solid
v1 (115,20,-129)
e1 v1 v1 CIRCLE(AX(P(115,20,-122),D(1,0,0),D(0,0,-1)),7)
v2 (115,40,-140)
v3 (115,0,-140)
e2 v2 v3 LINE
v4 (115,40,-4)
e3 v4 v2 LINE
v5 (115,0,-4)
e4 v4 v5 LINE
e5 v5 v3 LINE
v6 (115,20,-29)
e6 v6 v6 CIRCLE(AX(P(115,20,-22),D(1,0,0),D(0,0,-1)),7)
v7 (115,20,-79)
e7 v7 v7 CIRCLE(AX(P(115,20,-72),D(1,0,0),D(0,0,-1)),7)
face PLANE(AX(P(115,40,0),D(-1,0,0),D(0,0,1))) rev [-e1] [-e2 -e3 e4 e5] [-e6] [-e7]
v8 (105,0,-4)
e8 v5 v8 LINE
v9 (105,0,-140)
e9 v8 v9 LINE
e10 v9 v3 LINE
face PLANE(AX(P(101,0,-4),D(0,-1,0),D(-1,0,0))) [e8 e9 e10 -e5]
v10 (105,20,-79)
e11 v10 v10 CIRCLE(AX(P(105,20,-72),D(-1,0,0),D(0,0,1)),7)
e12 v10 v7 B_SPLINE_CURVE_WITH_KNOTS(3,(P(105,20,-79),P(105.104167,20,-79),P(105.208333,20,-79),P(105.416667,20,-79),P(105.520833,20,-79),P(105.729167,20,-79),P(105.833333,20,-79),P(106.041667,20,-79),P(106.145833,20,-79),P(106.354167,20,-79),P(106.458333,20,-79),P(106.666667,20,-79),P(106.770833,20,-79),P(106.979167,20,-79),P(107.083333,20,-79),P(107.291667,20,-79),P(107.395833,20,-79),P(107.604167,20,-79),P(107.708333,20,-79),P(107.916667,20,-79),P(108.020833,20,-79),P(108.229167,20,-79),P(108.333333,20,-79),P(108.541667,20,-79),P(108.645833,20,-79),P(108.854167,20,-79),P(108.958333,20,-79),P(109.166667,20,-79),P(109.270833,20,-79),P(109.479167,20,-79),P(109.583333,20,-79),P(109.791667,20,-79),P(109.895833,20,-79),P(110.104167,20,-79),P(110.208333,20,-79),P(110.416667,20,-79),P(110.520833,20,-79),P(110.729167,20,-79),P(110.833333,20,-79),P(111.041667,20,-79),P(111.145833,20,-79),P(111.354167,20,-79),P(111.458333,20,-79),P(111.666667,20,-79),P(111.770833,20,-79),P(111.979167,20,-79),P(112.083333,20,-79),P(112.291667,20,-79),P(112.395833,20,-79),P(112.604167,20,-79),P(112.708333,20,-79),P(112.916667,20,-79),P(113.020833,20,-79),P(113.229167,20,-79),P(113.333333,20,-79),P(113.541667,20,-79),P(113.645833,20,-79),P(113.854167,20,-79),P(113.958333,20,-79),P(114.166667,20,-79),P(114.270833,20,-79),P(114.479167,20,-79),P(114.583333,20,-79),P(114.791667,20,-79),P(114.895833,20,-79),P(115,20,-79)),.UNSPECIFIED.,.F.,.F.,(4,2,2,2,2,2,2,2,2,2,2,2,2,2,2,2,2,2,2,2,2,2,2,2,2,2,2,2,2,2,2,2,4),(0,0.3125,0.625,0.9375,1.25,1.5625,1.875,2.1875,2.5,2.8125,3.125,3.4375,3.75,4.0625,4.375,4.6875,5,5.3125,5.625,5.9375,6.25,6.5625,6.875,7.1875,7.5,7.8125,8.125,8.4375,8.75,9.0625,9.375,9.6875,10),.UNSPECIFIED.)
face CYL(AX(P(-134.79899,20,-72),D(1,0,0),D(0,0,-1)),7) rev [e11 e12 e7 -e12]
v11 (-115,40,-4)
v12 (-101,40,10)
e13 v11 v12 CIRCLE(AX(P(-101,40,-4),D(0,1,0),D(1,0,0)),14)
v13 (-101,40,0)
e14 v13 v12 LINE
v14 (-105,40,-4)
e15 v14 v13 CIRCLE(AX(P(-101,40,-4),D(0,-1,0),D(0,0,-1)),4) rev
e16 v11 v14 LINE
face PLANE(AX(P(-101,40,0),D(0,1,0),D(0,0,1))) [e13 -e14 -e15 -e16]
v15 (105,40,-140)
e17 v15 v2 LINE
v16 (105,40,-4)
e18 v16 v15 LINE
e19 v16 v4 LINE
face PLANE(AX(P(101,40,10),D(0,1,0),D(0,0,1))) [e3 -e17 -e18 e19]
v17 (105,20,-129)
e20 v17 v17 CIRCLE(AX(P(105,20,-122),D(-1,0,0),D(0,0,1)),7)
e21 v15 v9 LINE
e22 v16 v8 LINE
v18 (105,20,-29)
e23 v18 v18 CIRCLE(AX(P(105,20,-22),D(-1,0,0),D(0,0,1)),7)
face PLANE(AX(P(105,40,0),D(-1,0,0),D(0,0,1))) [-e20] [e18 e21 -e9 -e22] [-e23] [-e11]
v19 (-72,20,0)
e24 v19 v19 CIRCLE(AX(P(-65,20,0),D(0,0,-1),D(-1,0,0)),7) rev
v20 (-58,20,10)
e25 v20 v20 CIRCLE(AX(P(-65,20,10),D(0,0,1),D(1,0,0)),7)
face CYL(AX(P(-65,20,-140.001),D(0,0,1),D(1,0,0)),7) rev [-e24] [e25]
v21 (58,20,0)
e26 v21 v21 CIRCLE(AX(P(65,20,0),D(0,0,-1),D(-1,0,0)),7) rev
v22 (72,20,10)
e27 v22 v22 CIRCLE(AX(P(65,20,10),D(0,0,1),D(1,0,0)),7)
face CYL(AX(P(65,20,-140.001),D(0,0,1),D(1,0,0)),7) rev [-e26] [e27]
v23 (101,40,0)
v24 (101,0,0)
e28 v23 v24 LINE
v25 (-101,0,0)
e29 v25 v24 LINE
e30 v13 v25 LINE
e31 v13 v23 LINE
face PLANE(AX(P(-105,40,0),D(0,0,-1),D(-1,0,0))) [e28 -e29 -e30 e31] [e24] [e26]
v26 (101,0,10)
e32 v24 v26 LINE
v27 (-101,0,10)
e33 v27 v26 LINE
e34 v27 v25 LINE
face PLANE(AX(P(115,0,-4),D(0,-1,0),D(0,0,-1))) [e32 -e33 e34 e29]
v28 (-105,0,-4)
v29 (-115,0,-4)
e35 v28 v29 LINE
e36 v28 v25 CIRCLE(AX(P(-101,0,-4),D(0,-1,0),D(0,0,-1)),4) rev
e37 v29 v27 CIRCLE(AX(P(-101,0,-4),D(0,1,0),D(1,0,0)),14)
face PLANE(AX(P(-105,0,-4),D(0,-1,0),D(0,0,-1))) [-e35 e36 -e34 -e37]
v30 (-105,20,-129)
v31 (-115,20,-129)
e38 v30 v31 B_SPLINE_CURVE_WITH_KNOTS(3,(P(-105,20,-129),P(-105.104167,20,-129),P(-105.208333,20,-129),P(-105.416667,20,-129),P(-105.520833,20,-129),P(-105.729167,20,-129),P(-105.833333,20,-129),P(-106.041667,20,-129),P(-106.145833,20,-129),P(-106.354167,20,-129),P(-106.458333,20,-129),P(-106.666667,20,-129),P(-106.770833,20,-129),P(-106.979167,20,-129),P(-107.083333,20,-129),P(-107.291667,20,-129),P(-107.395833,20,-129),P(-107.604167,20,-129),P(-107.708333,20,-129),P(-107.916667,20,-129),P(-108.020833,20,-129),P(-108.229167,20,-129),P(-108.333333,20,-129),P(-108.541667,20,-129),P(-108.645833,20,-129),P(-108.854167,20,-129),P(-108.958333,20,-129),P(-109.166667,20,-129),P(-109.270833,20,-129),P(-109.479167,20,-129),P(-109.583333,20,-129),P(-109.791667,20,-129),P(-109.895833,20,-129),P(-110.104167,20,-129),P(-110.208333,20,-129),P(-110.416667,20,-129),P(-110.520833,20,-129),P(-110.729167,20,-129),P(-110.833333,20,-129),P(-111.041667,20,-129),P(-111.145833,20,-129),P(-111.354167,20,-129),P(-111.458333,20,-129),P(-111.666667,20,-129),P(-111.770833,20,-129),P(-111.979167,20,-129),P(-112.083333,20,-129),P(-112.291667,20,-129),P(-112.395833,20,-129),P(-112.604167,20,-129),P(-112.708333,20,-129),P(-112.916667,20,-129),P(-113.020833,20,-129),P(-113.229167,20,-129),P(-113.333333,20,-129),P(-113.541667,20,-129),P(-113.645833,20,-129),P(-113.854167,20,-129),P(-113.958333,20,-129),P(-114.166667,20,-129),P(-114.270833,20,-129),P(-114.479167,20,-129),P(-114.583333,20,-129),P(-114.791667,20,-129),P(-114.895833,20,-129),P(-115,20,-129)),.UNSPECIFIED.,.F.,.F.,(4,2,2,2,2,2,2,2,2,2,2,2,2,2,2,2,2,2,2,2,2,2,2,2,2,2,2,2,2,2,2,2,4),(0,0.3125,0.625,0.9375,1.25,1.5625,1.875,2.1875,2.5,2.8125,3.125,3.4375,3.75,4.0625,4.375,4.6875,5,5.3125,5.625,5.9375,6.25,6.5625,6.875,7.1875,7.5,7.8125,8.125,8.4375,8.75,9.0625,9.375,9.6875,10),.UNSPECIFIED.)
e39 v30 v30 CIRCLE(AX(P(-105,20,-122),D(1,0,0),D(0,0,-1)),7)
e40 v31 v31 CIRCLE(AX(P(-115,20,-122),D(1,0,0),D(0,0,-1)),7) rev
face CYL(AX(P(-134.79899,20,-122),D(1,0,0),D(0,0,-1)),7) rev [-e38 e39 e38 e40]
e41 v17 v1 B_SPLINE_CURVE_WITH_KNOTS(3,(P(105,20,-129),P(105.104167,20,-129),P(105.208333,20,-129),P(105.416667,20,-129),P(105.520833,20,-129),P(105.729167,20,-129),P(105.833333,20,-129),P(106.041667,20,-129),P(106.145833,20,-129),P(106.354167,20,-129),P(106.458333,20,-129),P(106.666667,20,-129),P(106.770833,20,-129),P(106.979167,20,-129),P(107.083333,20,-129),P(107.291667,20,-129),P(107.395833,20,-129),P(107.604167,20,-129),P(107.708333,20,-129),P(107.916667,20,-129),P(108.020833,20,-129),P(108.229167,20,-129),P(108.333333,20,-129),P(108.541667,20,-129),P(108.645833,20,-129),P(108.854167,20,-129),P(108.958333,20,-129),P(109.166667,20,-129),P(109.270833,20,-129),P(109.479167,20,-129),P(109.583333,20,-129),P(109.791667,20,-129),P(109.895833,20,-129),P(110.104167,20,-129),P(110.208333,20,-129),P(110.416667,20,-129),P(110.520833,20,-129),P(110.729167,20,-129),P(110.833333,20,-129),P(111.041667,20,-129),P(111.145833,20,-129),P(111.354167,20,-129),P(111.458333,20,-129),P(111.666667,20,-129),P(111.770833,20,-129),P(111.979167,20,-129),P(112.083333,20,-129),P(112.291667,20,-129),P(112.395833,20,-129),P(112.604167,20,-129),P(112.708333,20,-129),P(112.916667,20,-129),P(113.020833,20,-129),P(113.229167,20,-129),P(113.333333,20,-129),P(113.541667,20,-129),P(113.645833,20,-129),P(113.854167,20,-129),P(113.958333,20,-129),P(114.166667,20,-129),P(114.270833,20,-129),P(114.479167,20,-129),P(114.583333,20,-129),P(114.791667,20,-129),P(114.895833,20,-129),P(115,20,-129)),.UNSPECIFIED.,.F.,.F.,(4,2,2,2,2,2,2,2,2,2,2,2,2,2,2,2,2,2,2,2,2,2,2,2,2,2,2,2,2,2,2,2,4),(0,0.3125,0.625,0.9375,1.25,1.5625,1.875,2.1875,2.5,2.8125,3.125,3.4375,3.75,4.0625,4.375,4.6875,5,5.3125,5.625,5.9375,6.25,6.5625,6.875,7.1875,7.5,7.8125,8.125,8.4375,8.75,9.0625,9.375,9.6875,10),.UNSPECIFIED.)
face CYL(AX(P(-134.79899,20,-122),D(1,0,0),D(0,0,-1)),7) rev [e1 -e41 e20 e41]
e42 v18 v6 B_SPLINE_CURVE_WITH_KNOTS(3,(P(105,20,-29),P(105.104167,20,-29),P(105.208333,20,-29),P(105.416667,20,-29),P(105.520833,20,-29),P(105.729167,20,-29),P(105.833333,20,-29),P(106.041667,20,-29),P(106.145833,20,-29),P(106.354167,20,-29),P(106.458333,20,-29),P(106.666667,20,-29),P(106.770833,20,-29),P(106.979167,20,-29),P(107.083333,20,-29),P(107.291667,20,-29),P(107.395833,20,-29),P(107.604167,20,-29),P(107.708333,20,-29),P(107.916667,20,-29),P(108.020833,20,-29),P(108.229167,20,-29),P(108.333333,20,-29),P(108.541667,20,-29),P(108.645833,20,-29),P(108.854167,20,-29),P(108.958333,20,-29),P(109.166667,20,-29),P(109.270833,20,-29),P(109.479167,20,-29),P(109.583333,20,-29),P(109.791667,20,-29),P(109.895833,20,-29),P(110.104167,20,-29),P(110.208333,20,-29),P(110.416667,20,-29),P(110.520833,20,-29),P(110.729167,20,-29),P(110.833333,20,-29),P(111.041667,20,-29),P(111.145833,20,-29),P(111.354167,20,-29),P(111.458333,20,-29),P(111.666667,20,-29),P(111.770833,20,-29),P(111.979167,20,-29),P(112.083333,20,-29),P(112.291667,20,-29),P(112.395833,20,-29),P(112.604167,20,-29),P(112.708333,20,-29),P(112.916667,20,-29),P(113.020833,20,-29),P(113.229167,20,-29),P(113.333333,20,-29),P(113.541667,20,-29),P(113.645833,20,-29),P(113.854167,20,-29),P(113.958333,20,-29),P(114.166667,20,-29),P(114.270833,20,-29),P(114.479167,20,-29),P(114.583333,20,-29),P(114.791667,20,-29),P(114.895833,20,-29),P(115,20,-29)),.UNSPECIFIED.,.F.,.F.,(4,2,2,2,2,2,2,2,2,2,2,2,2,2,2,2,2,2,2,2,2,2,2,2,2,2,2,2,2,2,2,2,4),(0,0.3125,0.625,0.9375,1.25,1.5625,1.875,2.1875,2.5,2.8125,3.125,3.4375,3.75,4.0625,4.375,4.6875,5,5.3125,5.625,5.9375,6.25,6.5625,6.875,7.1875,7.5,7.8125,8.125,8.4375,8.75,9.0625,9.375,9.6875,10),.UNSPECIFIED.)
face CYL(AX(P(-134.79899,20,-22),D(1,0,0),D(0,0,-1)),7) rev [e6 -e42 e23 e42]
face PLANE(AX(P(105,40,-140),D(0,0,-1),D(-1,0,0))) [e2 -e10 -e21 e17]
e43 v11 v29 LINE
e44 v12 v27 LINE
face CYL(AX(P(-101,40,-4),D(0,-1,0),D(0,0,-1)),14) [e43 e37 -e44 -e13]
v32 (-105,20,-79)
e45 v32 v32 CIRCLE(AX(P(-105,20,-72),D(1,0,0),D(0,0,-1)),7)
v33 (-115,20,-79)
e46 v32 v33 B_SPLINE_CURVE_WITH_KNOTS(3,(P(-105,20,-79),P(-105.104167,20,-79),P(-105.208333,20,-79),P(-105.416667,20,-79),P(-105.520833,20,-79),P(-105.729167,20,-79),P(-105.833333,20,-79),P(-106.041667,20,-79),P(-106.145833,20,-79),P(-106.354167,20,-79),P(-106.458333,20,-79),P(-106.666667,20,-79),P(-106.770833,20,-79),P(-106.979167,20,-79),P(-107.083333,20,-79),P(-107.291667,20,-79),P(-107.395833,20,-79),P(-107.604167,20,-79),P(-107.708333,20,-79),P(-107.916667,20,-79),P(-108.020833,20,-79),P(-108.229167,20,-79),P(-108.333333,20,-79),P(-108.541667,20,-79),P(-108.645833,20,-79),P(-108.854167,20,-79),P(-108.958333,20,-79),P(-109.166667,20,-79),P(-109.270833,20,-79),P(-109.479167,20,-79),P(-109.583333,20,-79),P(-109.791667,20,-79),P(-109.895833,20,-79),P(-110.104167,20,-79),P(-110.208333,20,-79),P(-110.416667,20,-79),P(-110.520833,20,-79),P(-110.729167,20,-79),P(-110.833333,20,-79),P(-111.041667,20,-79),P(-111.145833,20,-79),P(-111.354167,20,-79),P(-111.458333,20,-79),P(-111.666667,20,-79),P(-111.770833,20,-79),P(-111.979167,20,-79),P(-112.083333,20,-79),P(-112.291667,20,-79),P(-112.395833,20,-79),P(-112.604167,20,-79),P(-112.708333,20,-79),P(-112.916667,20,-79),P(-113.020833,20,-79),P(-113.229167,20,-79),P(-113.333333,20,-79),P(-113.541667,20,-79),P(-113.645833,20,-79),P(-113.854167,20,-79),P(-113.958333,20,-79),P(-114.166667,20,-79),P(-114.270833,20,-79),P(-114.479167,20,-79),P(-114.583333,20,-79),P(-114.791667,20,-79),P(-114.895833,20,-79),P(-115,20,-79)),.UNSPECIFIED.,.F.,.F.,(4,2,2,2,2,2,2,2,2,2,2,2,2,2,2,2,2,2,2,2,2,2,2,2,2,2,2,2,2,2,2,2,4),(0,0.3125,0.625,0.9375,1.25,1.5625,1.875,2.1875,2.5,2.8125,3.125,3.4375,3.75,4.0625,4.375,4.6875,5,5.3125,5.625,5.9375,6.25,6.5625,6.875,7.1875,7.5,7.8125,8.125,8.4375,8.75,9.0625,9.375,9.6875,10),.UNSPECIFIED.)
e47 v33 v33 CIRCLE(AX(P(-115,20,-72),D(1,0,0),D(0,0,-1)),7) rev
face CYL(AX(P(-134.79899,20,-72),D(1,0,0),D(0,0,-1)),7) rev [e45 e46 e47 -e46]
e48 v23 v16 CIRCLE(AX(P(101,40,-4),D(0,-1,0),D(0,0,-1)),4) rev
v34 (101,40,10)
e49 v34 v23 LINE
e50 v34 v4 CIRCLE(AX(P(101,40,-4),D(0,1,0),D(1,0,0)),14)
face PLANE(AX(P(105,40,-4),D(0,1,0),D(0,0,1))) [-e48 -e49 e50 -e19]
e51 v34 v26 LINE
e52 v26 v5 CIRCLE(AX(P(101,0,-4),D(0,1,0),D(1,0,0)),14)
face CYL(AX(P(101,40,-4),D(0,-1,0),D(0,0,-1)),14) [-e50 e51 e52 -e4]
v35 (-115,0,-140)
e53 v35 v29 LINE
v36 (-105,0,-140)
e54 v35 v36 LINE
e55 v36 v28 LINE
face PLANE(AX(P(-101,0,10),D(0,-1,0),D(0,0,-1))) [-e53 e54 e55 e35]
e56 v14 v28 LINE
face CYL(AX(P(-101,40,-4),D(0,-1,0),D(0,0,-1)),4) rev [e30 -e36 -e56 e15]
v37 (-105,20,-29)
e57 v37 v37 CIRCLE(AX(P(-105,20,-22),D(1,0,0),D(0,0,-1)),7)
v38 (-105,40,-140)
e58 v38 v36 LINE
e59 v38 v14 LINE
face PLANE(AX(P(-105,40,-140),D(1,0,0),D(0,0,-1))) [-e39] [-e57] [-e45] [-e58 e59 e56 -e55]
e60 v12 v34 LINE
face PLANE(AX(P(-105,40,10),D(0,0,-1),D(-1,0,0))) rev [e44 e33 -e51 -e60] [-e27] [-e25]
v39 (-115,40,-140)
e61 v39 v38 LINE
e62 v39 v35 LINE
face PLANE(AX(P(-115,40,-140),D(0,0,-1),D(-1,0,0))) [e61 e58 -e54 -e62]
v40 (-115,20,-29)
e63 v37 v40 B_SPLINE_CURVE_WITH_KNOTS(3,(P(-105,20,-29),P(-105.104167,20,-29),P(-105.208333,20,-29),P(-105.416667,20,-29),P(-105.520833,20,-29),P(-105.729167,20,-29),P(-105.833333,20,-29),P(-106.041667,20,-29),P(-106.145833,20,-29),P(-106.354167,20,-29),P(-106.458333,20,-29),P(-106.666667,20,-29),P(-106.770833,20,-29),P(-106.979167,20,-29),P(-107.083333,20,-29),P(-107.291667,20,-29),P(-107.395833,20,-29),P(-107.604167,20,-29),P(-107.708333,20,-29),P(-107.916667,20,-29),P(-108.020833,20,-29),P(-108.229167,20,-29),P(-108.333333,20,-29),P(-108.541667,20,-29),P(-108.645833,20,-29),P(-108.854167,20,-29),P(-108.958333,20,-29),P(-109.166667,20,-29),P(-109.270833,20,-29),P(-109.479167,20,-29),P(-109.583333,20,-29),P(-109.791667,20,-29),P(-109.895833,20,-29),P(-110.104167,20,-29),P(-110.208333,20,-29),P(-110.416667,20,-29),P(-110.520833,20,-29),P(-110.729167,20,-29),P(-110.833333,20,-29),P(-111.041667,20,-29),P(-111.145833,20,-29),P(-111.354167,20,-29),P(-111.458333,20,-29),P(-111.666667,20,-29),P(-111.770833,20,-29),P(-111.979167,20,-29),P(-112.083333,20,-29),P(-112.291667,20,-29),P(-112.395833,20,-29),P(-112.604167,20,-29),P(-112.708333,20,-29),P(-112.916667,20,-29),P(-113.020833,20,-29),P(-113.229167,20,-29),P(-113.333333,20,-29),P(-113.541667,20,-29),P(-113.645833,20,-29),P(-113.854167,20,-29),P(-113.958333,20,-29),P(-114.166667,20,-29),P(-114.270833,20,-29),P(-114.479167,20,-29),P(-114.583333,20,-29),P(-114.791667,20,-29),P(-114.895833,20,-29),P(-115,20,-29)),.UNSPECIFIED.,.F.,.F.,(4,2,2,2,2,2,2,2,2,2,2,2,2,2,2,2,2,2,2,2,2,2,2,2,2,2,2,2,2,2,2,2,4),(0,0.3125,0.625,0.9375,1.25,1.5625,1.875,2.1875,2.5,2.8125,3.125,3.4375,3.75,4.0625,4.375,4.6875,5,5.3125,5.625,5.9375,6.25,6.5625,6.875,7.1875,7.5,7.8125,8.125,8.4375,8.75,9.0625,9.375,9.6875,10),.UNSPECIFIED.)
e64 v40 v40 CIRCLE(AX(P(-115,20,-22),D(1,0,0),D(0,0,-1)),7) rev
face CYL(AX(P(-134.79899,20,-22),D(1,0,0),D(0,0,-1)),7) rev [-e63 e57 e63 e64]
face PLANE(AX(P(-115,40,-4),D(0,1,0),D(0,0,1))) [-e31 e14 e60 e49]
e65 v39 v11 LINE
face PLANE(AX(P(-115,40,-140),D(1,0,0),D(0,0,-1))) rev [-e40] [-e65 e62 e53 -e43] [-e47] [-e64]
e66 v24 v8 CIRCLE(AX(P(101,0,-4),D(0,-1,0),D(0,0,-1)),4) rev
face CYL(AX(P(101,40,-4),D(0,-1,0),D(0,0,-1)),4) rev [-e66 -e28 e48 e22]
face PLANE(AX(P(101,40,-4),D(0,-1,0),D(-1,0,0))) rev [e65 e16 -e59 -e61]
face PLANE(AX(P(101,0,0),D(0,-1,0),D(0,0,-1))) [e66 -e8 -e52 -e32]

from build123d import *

# Parameters (mm, degrees)
SM_BASE_FLANGE_1_DEPTH = 40
CUT_EXTRUDE_1_REACH    = 195.197
SKETCH_6_R             = 7
CUT_EXTRUDE_2_REACH    = 274.213
SKETCH_7_R             = 7


# Sheet-metal steps are written as plain solids
with BuildPart() as part:
    # Sketch 1 → 基体-法兰1 (new body)
    with BuildSketch(Plane(origin=(0, 0, 0), x_dir=(1, 0, 0), z_dir=(0, 1, 0))):
        with BuildLine():
            Line((-105, 140), (-105, 4))
            ThreePointArc((-105, 4), (-103.828427125, 1.171572875), (-101, 0))
            Line((-101, 0), (101, 0))
            ThreePointArc((101, 0), (103.828427125, 1.171572875), (105, 4))
            Line((105, 4), (105, 140))
            Line((105, 140), (115, 140))
            Line((115, 140), (115, 4))
            ThreePointArc((115, 4), (110.899494937, -5.899494937), (101, -10))
            Line((101, -10), (-101, -10))
            ThreePointArc((-101, -10), (-110.899494937, -5.899494937), (-115, 4))
            Line((-115, 4), (-115, 140))
            Line((-115, 140), (-105, 140))
        make_face()
    extrude(amount=SM_BASE_FLANGE_1_DEPTH)

    # 草图6 → 切除-拉伸1 (cut, up to next)
    with BuildSketch(Plane.XY.offset(10), mode=Mode.PRIVATE) as cut_extrude_1_sk1:
        with Locations((-65, 20)):
            Circle(SKETCH_6_R)
    cut_extrude_1_tool1 = extrude(cut_extrude_1_sk1.sketch, amount=-CUT_EXTRUDE_1_REACH, mode=Mode.PRIVATE) & part.part
    # 草图6 → 切除-拉伸1 (cut, up to next)
    with BuildSketch(Plane.XY.offset(10), mode=Mode.PRIVATE) as cut_extrude_1_sk2:
        with Locations((65, 20)):
            Circle(SKETCH_6_R)
    cut_extrude_1_tool2 = extrude(cut_extrude_1_sk2.sketch, amount=-CUT_EXTRUDE_1_REACH, mode=Mode.PRIVATE) & part.part
    add(cut_extrude_1_tool1.solids().sort_by_distance((-65, 20, 10))[0], mode=Mode.SUBTRACT)
    add(cut_extrude_1_tool2.solids().sort_by_distance((65, 20, 10))[0], mode=Mode.SUBTRACT)

    # 切除-拉伸2: up to this face of the body (flat: up to its plane)
    cut_extrude_2_end = Plane(part.part.faces().sort_by_distance((-115, 20, -72))[0])
    # 草图7 → 切除-拉伸2 (cut, up to the picked face)
    with BuildSketch(Plane(origin=(115, 0, 0), x_dir=(0, 0, -1), z_dir=(1, 0, 0)), mode=Mode.PRIVATE) as cut_extrude_2_sk1:
        with Locations((122, 20)):
            Circle(SKETCH_7_R)
    cut_extrude_2_tool1 = split(extrude(cut_extrude_2_sk1.sketch, amount=-CUT_EXTRUDE_2_REACH, mode=Mode.PRIVATE), bisect_by=cut_extrude_2_end, keep=Keep.BOTH, mode=Mode.PRIVATE)
    # 草图7 → 切除-拉伸2 (cut, up to the picked face)
    with BuildSketch(Plane(origin=(115, 0, 0), x_dir=(0, 0, -1), z_dir=(1, 0, 0)), mode=Mode.PRIVATE) as cut_extrude_2_sk2:
        with Locations((72, 20)):
            Circle(SKETCH_7_R)
    cut_extrude_2_tool2 = split(extrude(cut_extrude_2_sk2.sketch, amount=-CUT_EXTRUDE_2_REACH, mode=Mode.PRIVATE), bisect_by=cut_extrude_2_end, keep=Keep.BOTH, mode=Mode.PRIVATE)
    # 草图7 → 切除-拉伸2 (cut, up to the picked face)
    with BuildSketch(Plane(origin=(115, 0, 0), x_dir=(0, 0, -1), z_dir=(1, 0, 0)), mode=Mode.PRIVATE) as cut_extrude_2_sk3:
        with Locations((22, 20)):
            Circle(SKETCH_7_R)
    cut_extrude_2_tool3 = split(extrude(cut_extrude_2_sk3.sketch, amount=-CUT_EXTRUDE_2_REACH, mode=Mode.PRIVATE), bisect_by=cut_extrude_2_end, keep=Keep.BOTH, mode=Mode.PRIVATE)
    add(cut_extrude_2_tool1.solids().sort_by(Axis((115, 20, -122), (-1, 0, 0)))[0], mode=Mode.SUBTRACT)
    add(cut_extrude_2_tool2.solids().sort_by(Axis((115, 20, -72), (-1, 0, 0)))[0], mode=Mode.SUBTRACT)
    add(cut_extrude_2_tool3.solids().sort_by(Axis((115, 20, -22), (-1, 0, 0)))[0], mode=Mode.SUBTRACT)


solid = part.part
